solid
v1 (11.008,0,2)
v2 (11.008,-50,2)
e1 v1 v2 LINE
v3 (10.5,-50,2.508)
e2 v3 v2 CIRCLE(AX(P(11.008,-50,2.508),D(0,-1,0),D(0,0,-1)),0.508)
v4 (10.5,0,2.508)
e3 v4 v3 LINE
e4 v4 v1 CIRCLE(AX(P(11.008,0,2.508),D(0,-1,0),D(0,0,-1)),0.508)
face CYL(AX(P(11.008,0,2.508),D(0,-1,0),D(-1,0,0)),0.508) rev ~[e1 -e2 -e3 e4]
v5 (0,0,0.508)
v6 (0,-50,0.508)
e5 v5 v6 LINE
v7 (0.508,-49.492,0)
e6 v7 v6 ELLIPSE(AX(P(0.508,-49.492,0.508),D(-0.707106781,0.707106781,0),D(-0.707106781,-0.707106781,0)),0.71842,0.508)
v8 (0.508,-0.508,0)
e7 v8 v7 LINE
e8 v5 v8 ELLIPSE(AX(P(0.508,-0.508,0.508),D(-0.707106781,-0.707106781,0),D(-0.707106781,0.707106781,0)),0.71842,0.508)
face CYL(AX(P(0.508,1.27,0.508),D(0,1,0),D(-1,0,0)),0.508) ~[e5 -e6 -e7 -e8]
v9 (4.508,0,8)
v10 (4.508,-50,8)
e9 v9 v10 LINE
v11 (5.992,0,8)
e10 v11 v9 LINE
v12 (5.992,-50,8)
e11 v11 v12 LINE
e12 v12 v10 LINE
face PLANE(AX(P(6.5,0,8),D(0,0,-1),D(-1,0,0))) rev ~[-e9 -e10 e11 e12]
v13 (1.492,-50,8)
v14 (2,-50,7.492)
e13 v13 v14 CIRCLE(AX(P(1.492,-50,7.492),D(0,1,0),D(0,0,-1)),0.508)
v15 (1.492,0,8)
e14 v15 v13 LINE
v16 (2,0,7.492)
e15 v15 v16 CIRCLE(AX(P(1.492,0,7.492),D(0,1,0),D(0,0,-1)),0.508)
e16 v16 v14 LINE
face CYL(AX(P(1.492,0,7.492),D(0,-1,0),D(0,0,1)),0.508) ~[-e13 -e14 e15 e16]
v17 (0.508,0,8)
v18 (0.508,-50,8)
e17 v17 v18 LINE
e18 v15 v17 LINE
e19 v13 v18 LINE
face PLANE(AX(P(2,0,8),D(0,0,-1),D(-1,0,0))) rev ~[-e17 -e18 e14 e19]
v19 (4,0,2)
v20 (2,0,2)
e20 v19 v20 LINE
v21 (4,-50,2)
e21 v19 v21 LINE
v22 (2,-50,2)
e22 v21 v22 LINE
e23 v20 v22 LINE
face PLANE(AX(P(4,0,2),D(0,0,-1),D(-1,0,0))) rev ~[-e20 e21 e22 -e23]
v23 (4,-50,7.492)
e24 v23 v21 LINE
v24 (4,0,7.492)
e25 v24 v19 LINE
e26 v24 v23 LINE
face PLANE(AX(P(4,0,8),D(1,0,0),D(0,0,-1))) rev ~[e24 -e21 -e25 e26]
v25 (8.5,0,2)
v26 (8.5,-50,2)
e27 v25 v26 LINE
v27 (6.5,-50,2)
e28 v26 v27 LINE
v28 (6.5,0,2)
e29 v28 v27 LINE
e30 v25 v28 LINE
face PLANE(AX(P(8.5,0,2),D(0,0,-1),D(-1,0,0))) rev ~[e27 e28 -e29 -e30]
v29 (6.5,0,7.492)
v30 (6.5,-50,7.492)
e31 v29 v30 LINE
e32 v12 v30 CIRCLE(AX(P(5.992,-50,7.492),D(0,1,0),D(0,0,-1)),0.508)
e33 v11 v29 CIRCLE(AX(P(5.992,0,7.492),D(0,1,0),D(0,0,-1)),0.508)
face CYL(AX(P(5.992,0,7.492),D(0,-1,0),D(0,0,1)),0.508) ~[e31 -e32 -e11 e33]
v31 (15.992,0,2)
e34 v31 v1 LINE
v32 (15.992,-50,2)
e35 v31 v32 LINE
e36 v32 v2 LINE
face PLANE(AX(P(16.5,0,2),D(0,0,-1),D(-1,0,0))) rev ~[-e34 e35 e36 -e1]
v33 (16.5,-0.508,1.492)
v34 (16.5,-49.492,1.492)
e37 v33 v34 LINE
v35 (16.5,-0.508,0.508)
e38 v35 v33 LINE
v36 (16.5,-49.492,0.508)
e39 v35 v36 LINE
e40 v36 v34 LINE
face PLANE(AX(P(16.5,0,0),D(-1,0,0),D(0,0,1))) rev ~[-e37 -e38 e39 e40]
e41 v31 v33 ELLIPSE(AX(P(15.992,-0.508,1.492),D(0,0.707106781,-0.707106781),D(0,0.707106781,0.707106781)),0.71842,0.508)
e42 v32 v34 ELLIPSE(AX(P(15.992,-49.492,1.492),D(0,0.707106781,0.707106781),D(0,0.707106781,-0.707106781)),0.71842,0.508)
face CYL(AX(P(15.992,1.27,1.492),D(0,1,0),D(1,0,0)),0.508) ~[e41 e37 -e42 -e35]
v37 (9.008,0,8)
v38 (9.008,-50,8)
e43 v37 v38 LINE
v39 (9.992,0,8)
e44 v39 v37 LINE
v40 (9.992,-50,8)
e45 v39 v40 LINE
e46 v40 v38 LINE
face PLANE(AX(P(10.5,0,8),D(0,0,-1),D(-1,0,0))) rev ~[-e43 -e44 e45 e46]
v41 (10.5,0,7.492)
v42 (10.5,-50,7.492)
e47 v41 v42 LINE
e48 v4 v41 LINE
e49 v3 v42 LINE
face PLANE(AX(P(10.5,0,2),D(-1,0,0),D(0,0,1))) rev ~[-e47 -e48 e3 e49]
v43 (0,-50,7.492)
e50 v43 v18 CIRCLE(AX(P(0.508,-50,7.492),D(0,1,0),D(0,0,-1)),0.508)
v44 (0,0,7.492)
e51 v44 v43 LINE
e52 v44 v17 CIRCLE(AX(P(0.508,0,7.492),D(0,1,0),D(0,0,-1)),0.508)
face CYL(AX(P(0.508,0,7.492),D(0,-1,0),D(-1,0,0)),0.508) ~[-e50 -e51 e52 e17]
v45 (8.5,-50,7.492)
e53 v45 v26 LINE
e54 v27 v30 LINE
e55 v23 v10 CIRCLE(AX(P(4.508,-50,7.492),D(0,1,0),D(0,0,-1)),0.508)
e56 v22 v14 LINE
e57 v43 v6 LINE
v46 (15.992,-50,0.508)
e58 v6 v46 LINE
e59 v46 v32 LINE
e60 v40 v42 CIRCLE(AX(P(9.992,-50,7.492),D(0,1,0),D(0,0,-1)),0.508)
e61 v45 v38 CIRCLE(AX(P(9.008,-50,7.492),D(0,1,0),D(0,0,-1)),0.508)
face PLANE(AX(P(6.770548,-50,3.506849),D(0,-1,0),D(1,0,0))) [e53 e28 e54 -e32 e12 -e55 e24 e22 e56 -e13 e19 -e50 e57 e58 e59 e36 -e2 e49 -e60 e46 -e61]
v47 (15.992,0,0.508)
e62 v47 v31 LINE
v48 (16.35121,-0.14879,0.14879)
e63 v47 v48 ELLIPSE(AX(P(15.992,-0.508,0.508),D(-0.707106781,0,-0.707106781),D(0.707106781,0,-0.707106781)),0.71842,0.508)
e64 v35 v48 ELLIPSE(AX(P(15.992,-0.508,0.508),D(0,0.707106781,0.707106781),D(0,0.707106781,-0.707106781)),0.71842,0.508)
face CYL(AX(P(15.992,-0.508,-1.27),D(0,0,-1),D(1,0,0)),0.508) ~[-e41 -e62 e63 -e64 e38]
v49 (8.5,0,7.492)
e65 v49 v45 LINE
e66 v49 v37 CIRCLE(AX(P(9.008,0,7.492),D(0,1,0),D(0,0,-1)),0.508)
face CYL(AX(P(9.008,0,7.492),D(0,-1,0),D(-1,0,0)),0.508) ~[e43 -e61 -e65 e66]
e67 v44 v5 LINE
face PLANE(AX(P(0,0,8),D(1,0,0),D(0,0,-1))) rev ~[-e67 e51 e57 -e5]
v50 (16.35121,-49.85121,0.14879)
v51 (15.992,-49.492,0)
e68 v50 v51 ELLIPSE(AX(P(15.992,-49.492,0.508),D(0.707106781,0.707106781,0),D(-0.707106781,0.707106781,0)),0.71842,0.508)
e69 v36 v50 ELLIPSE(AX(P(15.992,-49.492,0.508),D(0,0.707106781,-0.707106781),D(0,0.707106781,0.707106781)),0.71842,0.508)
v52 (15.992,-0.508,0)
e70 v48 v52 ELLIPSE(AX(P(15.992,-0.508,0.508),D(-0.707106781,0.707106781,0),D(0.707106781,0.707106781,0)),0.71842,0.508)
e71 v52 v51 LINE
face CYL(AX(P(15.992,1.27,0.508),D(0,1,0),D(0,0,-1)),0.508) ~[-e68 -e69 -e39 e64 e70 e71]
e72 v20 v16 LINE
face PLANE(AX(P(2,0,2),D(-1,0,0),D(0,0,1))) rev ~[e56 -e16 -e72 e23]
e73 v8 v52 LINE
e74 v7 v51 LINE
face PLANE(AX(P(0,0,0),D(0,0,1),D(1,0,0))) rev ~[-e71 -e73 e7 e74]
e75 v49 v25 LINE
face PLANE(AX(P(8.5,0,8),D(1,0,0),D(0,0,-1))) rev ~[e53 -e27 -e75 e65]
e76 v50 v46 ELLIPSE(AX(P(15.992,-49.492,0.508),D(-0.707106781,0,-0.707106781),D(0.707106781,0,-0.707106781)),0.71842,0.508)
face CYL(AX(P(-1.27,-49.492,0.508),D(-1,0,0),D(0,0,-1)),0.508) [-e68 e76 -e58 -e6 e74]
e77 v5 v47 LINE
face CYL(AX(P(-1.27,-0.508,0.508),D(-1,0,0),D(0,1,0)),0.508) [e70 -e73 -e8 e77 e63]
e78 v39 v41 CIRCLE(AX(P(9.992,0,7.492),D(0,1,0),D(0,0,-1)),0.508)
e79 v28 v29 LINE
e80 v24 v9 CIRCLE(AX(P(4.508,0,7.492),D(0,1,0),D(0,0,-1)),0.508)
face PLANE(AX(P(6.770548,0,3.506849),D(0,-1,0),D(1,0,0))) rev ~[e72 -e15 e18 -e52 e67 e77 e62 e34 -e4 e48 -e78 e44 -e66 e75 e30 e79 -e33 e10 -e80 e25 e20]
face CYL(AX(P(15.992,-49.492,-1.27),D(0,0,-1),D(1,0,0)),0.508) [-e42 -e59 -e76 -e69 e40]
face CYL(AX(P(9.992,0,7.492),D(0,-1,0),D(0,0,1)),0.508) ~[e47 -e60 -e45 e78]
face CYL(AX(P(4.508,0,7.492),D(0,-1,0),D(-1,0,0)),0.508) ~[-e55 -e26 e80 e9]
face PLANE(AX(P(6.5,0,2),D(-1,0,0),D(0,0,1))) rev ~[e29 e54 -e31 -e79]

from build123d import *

# Parameters (mm, degrees)
F1_DEPTH    = 50
F2_T1_DEPTH = 52.54
F2_T3_DEPTH = 4.54
F3_R        = 0.508
F4_T1_DEPTH = 18.532
F4_T3_DEPTH = 52.54
F5_R        = 0.508


# Not quite as in the source:
# - a fillet or chamfer that OpenCascade refuses, or shapes differently, is made with other operations: its cross-section is extruded or revolved along the edge and cut away or added


with BuildPart() as f1:
    # F0 (on Front) → F1 (new body)
    with BuildSketch(Plane.XZ):
        Polygon((0, 8), (0, 0), (16.5, 0), (16.5, 2), (10.5, 2), (10.5, 8), (8.5, 8), (8.5, 2), (6.5, 2), (6.5, 8), (4, 8), (4, 2), (2, 2), (2, 8), align=None)
    extrude(amount=F1_DEPTH)

    # F2: fillet of radius 0.508 on 4 edges, made by hand

    # F2_s2 → F2_t1 (cut)
    with BuildSketch(Plane.XZ.offset(-1.27)):
        with BuildLine():
            ThreePointArc((15.992, 0), (16.3512102448, 0.1487897552), (16.5, 0.508))
            Line((16.5, 0.508), (16.5, 0))
            Line((16.5, 0), (15.992, 0))
        make_face()
        with BuildLine():
            ThreePointArc((16.5, 1.492), (16.3512102448, 1.8512102448), (15.992, 2))
            Line((15.992, 2), (16.5, 2))
            Line((16.5, 2), (16.5, 1.492))
        make_face()
    extrude(amount=F2_T1_DEPTH, mode=Mode.SUBTRACT)

    # F2_s4 → F2_t3 (cut)
    with BuildSketch(Plane.XY.offset(-1.27)):
        with BuildLine():
            ThreePointArc((16.5, -0.508), (16.3512102448, -0.1487897552), (15.992, 0))
            Line((15.992, 0), (16.5, 0))
            Line((16.5, 0), (16.5, -0.508))
        make_face()
        with BuildLine():
            ThreePointArc((16.5, -49.492), (16.3512102448, -49.8512102448), (15.992, -50))
            Line((15.992, -50), (16.5, -50))
            Line((16.5, -50), (16.5, -49.492))
        make_face()
    extrude(amount=F2_T3_DEPTH, mode=Mode.SUBTRACT)

    # F3
    f3_edges = [f1.edges().sort_by_distance(p)[0] for p in [
        (8.5, -25, 8),
        (10.5, -25, 8),
        (6.5, -25, 8),
        (4, -25, 8),
        (2, -25, 8),
        (0, -25, 8),
    ]]
    fillet(f3_edges, radius=F3_R)

    # F4: fillet of radius 0.508 on 4 edges, made by hand

    # F4_s2 → F4_t1 (cut)
    with BuildSketch(Plane.YZ.offset(-1.27)):
        with BuildLine():
            ThreePointArc((0, 0.508), (-0.1487897552, 0.1487897552), (-0.508, 0))
            Line((-0.508, 0), (0, 0))
            Line((0, 0), (0, 0.508))
        make_face()
        with BuildLine():
            ThreePointArc((-49.492, 0), (-49.8512102448, 0.1487897552), (-50, 0.508))
            Line((-50, 0.508), (-50, 0))
            Line((-50, 0), (-49.492, 0))
        make_face()
    extrude(amount=F4_T1_DEPTH, mode=Mode.SUBTRACT)

    # F4_s4 → F4_t3 (cut)
    with BuildSketch(Plane.XZ.offset(-1.27)):
        with BuildLine():
            ThreePointArc((0, 0.508), (0.1487897552, 0.1487897552), (0.508, 0))
            Line((0.508, 0), (0, 0))
            Line((0, 0), (0, 0.508))
        make_face()
    extrude(amount=F4_T3_DEPTH, mode=Mode.SUBTRACT)

    # F5
    f5_edges = [f1.edges().sort_by_distance(p)[0] for p in [
        (10.5, -25, 2),
    ]]
    fillet(f5_edges, radius=F5_R)


solid = f1.part
